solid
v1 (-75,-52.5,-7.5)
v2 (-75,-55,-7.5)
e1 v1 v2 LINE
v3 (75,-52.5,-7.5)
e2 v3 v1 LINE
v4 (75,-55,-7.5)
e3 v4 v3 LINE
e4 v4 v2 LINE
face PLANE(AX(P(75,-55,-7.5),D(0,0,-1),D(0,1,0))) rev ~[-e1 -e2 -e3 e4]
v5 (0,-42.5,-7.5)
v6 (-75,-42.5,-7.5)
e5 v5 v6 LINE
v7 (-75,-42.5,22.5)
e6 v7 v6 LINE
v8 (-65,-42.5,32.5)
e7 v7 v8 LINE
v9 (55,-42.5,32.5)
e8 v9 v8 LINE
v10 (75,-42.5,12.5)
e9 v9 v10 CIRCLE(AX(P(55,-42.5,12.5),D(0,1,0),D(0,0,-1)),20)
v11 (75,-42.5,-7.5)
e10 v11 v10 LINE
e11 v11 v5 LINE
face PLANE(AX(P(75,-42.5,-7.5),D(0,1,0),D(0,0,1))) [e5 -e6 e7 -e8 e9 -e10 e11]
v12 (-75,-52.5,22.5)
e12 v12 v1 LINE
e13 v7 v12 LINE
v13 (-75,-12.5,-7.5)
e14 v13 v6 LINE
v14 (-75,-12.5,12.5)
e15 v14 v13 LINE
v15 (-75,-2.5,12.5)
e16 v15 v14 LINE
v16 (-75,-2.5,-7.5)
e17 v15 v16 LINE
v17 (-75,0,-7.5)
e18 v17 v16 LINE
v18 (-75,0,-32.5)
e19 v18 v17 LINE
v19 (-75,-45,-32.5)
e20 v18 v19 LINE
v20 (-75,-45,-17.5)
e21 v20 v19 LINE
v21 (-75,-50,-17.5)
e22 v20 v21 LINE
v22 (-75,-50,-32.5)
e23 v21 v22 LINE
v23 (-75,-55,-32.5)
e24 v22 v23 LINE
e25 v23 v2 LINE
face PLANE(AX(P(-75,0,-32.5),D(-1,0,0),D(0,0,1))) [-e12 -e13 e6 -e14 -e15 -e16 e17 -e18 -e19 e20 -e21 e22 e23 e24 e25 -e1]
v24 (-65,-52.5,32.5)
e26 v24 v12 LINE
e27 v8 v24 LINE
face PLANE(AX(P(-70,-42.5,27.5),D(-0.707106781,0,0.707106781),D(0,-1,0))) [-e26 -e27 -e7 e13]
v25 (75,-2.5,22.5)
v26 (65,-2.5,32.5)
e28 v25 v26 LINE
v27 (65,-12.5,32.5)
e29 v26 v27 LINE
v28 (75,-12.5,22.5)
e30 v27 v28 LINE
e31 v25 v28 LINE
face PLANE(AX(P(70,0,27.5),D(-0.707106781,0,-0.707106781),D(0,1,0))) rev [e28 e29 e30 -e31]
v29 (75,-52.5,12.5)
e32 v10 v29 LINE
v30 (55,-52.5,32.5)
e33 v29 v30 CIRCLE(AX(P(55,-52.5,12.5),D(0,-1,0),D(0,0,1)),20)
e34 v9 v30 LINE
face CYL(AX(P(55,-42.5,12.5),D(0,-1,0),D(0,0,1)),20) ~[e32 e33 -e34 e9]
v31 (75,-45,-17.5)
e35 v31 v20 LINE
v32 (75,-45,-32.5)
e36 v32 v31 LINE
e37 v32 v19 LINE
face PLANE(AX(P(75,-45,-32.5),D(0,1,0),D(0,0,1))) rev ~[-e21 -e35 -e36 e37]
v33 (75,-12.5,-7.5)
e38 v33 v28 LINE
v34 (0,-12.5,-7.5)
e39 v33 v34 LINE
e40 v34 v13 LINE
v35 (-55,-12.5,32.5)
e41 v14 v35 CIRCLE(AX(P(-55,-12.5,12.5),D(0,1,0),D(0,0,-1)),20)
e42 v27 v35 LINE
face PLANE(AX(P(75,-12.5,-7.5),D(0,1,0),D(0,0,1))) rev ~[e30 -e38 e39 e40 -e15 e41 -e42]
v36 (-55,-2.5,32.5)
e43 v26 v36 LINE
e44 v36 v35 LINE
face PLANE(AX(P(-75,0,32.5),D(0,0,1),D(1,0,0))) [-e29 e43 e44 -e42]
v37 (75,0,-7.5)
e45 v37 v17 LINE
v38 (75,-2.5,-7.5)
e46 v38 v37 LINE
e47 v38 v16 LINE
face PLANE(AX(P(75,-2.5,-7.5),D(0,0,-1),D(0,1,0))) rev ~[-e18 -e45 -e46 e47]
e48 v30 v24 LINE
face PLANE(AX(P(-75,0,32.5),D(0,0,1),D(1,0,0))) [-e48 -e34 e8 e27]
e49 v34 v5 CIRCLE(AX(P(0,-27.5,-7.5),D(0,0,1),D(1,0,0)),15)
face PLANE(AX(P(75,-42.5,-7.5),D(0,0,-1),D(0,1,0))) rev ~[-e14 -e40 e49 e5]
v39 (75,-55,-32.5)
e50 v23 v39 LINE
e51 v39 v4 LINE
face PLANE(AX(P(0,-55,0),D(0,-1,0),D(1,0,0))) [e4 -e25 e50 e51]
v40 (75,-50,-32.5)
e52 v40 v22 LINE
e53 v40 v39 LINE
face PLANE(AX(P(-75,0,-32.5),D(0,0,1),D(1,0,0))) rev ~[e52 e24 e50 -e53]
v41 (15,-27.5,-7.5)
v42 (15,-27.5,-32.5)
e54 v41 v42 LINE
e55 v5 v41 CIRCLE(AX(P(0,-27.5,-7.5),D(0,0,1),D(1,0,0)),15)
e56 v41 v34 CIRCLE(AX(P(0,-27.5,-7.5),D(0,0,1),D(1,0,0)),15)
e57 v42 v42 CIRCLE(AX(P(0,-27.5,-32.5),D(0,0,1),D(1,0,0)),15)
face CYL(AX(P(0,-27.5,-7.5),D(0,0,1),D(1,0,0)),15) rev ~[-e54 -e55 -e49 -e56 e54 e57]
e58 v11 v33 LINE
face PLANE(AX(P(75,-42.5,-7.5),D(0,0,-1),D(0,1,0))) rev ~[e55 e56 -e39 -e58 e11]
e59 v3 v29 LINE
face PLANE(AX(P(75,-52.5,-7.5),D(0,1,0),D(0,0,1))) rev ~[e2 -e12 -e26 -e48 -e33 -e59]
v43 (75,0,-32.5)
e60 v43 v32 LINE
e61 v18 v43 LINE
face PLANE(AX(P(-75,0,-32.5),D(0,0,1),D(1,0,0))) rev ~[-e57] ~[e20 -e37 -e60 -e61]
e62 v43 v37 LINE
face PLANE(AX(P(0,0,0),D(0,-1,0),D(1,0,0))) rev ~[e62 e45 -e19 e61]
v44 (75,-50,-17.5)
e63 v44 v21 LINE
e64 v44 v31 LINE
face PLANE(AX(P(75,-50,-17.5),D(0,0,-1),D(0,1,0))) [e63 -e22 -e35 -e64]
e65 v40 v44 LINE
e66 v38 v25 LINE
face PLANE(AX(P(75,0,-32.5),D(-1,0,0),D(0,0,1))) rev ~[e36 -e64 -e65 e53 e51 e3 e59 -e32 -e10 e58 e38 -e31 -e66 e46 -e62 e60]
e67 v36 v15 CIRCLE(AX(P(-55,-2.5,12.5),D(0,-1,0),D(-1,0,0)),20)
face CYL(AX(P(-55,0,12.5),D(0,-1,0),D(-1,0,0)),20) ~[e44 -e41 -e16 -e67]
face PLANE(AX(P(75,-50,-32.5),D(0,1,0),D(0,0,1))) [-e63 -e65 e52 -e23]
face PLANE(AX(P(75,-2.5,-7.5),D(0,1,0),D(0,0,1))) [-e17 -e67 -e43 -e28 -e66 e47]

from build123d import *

# Parameters (mm, degrees)
F0_W      = 150
F0_H      = 65
F1_DEPTH  = 55
F2_W      = 5
F2_H      = 15
F3_DEPTH  = 150.001
F4_W      = 30
F4_H      = 40
F5_DEPTH  = 150.001
F6_SIZE   = 10
F7_R      = 20
F8_W      = 2.5
F8_H      = 43.3062759042
F9_DEPTH  = 150.001
F10_W     = 2.5
F10_H     = 43.4678007662
F11_DEPTH = 150.001
F12_R     = 15
F13_DEPTH = 25.001


with BuildPart() as f1:
    # F0 (on Front) → F1 (new body)
    with BuildSketch(Plane.XZ):
        Rectangle(F0_W, F0_H)
    extrude(amount=F1_DEPTH)

    # F2 (on face) → F3 (cut, through all)
    with BuildSketch(Plane.YZ.offset(75)):
        with Locations((-47.5, -25)):
            Rectangle(F2_W, F2_H)
    extrude(amount=-F3_DEPTH, mode=Mode.SUBTRACT)

    # F4 (on face) → F5 (cut, through all)
    with BuildSketch(Plane.YZ.offset(75)):
        with Locations((-27.5, 12.5)):
            Rectangle(F4_W, F4_H)
    extrude(amount=-F5_DEPTH, mode=Mode.SUBTRACT)

    # F6
    f6_edges = [f1.edges().sort_by_distance(p)[0] for p in [
        (75, -6.25, 32.5),
        (-75, -48.75, 32.5),
    ]]
    chamfer(f6_edges, length=F6_SIZE)

    # F7
    f7_edges = [f1.edges().sort_by_distance(p)[0] for p in [
        (75, -48.75, 32.5),
        (-75, -6.25, 32.5),
    ]]
    fillet(f7_edges, radius=F7_R)

    # F8 (on face) → F9 (cut, through all)
    with BuildSketch(Plane.YZ.offset(75)):
        with Locations((-53.75, 14.1531379521)):
            Rectangle(F8_W, F8_H)
    extrude(amount=-F9_DEPTH, mode=Mode.SUBTRACT)

    # F10 (on face) → F11 (cut, through all)
    with BuildSketch(Plane.YZ.offset(75)):
        with Locations((-1.25, 14.2339003831)):
            Rectangle(F10_W, F10_H)
    extrude(amount=-F11_DEPTH, mode=Mode.SUBTRACT)

    # F12 (on face) → F13 (cut, through all)
    with BuildSketch(Plane.XY.offset(-7.5)):
        with Locations((0, -27.5)):
            Circle(F12_R)
    extrude(amount=-F13_DEPTH, mode=Mode.SUBTRACT)


solid = f1.part
